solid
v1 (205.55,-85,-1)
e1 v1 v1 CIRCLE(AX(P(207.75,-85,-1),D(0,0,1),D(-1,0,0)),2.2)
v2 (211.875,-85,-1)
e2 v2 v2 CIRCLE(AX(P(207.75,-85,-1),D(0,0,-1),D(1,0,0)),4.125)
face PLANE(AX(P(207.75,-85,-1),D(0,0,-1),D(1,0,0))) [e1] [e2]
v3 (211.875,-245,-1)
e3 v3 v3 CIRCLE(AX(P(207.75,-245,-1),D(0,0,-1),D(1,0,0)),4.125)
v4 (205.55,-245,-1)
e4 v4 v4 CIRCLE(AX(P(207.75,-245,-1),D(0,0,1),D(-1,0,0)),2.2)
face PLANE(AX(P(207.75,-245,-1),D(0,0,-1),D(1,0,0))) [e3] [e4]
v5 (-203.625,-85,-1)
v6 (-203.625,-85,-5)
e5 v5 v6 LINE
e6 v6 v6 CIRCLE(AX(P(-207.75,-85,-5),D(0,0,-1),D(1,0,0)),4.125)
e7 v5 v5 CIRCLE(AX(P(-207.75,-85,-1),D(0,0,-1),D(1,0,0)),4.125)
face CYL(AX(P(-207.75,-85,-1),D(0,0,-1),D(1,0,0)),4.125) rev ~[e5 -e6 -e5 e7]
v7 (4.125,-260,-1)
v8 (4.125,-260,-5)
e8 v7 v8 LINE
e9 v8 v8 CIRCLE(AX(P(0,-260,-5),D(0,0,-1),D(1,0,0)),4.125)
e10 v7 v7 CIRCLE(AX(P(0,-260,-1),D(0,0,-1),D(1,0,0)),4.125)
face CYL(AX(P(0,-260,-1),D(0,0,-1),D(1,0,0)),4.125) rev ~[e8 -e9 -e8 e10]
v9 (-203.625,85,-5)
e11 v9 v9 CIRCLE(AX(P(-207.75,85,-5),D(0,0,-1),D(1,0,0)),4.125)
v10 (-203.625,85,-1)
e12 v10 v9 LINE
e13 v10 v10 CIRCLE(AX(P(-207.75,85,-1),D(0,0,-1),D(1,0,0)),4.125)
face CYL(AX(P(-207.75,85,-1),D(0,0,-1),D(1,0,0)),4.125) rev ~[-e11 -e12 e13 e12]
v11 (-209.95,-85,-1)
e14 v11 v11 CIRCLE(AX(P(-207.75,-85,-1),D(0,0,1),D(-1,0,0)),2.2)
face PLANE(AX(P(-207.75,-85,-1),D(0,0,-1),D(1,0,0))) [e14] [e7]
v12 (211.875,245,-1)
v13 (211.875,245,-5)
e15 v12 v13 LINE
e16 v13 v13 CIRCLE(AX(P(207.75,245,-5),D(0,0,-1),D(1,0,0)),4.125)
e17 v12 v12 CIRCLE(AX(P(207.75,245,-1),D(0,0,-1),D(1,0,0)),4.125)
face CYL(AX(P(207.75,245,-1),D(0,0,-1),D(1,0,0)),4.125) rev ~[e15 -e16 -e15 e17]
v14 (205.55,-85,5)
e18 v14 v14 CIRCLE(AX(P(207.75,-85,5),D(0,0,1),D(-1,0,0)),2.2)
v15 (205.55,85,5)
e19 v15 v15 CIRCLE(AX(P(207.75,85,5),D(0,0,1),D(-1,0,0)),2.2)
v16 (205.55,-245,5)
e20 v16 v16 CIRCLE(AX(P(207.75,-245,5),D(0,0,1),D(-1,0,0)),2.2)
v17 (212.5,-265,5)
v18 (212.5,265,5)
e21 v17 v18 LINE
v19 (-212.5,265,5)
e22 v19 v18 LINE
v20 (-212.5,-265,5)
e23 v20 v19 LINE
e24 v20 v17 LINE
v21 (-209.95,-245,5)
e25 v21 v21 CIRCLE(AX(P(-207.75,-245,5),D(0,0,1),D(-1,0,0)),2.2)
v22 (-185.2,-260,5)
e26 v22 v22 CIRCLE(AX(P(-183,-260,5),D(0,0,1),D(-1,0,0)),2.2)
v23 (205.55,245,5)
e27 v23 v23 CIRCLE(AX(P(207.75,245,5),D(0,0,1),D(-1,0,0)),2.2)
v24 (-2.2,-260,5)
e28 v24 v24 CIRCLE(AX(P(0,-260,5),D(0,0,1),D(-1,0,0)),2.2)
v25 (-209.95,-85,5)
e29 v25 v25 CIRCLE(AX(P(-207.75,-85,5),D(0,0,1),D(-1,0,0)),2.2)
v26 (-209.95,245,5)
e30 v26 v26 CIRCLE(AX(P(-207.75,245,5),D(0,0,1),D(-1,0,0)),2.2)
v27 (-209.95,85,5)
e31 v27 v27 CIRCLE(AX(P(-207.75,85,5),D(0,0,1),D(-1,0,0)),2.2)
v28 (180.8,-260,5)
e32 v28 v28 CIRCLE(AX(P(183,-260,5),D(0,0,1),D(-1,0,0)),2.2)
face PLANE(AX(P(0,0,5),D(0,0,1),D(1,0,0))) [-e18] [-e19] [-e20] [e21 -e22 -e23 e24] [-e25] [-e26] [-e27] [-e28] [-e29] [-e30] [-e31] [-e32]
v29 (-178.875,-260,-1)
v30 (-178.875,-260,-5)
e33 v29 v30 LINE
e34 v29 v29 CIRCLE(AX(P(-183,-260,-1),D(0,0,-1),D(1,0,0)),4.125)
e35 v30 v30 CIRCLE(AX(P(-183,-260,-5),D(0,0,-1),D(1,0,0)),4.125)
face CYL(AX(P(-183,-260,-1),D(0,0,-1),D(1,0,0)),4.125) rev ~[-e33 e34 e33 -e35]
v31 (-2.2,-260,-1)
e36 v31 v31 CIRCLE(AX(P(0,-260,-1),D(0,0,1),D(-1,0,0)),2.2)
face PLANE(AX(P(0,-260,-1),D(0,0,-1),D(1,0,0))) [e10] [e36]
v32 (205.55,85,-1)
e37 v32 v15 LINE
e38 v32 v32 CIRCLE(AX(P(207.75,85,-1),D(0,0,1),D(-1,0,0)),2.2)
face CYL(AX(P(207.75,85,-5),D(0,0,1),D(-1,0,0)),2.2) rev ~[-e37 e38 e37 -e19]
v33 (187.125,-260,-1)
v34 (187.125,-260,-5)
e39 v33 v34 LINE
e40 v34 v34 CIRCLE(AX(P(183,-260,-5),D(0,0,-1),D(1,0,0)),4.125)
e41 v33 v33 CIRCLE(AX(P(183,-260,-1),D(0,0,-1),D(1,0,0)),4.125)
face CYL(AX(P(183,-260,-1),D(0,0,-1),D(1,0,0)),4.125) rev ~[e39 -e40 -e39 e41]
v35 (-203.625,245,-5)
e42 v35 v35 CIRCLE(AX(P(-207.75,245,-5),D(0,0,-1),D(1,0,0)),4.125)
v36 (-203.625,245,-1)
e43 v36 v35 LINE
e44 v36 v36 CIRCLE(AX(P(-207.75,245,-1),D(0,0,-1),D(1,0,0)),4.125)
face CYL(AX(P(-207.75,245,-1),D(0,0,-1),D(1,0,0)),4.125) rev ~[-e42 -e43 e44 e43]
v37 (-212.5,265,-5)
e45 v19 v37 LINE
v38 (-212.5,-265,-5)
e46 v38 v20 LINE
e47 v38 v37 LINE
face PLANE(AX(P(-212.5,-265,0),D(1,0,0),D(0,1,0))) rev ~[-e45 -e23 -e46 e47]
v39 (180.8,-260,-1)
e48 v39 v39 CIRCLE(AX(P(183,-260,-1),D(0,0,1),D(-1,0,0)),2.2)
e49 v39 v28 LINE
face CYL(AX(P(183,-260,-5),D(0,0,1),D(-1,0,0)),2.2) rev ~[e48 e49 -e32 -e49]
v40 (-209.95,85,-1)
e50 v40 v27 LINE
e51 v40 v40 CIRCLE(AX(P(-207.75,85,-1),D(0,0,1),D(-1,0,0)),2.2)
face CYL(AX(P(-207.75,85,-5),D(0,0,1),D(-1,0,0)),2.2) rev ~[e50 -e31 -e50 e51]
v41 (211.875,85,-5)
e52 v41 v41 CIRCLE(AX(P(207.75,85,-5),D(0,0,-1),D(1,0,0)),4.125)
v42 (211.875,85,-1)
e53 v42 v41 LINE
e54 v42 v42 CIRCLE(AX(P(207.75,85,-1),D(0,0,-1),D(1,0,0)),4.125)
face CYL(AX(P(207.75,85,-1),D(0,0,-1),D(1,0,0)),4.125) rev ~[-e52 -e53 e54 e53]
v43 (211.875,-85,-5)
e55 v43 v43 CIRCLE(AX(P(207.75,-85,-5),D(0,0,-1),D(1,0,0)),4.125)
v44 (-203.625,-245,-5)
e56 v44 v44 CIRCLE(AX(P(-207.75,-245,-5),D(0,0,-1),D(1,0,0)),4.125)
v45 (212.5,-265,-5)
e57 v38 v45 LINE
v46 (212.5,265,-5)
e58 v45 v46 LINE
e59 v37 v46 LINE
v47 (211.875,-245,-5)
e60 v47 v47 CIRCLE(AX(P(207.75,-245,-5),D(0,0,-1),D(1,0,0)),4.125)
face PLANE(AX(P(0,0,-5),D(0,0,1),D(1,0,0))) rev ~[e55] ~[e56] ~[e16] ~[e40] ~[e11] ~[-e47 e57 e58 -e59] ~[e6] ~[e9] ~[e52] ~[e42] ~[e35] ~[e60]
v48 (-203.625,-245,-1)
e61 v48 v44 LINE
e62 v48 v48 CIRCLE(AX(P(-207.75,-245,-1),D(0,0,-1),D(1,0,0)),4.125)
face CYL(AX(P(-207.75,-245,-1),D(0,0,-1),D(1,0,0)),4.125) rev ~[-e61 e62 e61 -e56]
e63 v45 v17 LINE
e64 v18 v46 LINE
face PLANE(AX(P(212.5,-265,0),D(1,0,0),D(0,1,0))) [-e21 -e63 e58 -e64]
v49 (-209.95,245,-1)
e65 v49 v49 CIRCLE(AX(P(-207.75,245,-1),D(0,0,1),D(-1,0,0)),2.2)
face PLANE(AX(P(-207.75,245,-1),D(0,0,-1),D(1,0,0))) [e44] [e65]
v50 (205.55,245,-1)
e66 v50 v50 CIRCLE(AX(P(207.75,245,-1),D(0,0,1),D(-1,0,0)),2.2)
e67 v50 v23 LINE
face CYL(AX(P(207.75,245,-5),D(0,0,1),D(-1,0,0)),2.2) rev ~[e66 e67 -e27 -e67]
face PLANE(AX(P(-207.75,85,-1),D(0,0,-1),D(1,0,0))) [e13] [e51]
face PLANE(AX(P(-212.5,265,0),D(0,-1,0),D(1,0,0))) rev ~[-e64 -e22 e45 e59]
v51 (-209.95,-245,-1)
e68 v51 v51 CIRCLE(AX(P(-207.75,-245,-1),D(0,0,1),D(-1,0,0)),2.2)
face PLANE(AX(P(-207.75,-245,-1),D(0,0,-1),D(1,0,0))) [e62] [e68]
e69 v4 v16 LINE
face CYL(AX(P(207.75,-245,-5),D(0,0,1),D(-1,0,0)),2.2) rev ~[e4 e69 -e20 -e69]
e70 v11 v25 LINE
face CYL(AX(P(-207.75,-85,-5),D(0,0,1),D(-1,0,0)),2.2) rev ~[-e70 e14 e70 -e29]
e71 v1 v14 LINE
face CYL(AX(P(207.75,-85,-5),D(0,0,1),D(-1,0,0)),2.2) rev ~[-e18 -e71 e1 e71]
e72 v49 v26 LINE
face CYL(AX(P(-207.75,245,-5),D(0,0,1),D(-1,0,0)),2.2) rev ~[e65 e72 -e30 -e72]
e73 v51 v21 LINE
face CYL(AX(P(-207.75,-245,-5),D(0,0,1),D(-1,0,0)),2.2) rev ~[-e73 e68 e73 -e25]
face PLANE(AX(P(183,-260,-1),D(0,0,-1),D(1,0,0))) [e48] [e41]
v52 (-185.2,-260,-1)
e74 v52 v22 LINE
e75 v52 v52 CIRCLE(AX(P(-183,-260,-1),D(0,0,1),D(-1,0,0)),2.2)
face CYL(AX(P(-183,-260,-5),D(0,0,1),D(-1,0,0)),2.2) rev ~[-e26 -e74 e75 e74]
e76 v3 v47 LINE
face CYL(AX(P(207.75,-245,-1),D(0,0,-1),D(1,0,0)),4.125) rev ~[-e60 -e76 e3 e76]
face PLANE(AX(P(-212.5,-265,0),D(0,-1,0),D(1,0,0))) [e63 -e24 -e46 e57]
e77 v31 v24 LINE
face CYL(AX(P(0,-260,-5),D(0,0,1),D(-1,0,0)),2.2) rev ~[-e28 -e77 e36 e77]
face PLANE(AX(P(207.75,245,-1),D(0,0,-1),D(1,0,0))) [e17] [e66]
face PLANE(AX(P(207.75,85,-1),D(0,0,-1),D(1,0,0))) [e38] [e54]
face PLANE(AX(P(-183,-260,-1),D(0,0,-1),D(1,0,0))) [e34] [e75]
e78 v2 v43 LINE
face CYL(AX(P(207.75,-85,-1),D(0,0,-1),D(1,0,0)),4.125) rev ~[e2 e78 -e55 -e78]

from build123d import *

# Parameters (mm, degrees)
F0_W           = 425
F0_H           = 530
F1_DEPTH       = 5
F3_D           = 4.4
F3_CBORE_D     = 8.25
F3_CBORE_DEPTH = 4


# Not quite as in the source:
# - a feature names something its author has since deleted; it is built from what else it names


with BuildPart() as f1:
    # F0 (on Top) → F1 (new body, symmetric)
    with BuildSketch(Plane.XY):
        Rectangle(F0_W, F0_H)
    extrude(amount=F1_DEPTH, both=True)

    # F3 (through all)
    with Locations(Plane(origin=(0, 0, -5), x_dir=(1, 0, 0), z_dir=(0, 0, -1))):
        with Locations((-207.75, 245), (-207.75, 85), (-207.75, -85), (-207.75, -245), (207.75, -245), (207.75, -85), (207.75, 85), (207.75, 245), (-183, 260), (0, 260), (183, 260)):
            CounterBoreHole(F3_D / 2, F3_CBORE_D / 2, F3_CBORE_DEPTH)


solid = f1.part
